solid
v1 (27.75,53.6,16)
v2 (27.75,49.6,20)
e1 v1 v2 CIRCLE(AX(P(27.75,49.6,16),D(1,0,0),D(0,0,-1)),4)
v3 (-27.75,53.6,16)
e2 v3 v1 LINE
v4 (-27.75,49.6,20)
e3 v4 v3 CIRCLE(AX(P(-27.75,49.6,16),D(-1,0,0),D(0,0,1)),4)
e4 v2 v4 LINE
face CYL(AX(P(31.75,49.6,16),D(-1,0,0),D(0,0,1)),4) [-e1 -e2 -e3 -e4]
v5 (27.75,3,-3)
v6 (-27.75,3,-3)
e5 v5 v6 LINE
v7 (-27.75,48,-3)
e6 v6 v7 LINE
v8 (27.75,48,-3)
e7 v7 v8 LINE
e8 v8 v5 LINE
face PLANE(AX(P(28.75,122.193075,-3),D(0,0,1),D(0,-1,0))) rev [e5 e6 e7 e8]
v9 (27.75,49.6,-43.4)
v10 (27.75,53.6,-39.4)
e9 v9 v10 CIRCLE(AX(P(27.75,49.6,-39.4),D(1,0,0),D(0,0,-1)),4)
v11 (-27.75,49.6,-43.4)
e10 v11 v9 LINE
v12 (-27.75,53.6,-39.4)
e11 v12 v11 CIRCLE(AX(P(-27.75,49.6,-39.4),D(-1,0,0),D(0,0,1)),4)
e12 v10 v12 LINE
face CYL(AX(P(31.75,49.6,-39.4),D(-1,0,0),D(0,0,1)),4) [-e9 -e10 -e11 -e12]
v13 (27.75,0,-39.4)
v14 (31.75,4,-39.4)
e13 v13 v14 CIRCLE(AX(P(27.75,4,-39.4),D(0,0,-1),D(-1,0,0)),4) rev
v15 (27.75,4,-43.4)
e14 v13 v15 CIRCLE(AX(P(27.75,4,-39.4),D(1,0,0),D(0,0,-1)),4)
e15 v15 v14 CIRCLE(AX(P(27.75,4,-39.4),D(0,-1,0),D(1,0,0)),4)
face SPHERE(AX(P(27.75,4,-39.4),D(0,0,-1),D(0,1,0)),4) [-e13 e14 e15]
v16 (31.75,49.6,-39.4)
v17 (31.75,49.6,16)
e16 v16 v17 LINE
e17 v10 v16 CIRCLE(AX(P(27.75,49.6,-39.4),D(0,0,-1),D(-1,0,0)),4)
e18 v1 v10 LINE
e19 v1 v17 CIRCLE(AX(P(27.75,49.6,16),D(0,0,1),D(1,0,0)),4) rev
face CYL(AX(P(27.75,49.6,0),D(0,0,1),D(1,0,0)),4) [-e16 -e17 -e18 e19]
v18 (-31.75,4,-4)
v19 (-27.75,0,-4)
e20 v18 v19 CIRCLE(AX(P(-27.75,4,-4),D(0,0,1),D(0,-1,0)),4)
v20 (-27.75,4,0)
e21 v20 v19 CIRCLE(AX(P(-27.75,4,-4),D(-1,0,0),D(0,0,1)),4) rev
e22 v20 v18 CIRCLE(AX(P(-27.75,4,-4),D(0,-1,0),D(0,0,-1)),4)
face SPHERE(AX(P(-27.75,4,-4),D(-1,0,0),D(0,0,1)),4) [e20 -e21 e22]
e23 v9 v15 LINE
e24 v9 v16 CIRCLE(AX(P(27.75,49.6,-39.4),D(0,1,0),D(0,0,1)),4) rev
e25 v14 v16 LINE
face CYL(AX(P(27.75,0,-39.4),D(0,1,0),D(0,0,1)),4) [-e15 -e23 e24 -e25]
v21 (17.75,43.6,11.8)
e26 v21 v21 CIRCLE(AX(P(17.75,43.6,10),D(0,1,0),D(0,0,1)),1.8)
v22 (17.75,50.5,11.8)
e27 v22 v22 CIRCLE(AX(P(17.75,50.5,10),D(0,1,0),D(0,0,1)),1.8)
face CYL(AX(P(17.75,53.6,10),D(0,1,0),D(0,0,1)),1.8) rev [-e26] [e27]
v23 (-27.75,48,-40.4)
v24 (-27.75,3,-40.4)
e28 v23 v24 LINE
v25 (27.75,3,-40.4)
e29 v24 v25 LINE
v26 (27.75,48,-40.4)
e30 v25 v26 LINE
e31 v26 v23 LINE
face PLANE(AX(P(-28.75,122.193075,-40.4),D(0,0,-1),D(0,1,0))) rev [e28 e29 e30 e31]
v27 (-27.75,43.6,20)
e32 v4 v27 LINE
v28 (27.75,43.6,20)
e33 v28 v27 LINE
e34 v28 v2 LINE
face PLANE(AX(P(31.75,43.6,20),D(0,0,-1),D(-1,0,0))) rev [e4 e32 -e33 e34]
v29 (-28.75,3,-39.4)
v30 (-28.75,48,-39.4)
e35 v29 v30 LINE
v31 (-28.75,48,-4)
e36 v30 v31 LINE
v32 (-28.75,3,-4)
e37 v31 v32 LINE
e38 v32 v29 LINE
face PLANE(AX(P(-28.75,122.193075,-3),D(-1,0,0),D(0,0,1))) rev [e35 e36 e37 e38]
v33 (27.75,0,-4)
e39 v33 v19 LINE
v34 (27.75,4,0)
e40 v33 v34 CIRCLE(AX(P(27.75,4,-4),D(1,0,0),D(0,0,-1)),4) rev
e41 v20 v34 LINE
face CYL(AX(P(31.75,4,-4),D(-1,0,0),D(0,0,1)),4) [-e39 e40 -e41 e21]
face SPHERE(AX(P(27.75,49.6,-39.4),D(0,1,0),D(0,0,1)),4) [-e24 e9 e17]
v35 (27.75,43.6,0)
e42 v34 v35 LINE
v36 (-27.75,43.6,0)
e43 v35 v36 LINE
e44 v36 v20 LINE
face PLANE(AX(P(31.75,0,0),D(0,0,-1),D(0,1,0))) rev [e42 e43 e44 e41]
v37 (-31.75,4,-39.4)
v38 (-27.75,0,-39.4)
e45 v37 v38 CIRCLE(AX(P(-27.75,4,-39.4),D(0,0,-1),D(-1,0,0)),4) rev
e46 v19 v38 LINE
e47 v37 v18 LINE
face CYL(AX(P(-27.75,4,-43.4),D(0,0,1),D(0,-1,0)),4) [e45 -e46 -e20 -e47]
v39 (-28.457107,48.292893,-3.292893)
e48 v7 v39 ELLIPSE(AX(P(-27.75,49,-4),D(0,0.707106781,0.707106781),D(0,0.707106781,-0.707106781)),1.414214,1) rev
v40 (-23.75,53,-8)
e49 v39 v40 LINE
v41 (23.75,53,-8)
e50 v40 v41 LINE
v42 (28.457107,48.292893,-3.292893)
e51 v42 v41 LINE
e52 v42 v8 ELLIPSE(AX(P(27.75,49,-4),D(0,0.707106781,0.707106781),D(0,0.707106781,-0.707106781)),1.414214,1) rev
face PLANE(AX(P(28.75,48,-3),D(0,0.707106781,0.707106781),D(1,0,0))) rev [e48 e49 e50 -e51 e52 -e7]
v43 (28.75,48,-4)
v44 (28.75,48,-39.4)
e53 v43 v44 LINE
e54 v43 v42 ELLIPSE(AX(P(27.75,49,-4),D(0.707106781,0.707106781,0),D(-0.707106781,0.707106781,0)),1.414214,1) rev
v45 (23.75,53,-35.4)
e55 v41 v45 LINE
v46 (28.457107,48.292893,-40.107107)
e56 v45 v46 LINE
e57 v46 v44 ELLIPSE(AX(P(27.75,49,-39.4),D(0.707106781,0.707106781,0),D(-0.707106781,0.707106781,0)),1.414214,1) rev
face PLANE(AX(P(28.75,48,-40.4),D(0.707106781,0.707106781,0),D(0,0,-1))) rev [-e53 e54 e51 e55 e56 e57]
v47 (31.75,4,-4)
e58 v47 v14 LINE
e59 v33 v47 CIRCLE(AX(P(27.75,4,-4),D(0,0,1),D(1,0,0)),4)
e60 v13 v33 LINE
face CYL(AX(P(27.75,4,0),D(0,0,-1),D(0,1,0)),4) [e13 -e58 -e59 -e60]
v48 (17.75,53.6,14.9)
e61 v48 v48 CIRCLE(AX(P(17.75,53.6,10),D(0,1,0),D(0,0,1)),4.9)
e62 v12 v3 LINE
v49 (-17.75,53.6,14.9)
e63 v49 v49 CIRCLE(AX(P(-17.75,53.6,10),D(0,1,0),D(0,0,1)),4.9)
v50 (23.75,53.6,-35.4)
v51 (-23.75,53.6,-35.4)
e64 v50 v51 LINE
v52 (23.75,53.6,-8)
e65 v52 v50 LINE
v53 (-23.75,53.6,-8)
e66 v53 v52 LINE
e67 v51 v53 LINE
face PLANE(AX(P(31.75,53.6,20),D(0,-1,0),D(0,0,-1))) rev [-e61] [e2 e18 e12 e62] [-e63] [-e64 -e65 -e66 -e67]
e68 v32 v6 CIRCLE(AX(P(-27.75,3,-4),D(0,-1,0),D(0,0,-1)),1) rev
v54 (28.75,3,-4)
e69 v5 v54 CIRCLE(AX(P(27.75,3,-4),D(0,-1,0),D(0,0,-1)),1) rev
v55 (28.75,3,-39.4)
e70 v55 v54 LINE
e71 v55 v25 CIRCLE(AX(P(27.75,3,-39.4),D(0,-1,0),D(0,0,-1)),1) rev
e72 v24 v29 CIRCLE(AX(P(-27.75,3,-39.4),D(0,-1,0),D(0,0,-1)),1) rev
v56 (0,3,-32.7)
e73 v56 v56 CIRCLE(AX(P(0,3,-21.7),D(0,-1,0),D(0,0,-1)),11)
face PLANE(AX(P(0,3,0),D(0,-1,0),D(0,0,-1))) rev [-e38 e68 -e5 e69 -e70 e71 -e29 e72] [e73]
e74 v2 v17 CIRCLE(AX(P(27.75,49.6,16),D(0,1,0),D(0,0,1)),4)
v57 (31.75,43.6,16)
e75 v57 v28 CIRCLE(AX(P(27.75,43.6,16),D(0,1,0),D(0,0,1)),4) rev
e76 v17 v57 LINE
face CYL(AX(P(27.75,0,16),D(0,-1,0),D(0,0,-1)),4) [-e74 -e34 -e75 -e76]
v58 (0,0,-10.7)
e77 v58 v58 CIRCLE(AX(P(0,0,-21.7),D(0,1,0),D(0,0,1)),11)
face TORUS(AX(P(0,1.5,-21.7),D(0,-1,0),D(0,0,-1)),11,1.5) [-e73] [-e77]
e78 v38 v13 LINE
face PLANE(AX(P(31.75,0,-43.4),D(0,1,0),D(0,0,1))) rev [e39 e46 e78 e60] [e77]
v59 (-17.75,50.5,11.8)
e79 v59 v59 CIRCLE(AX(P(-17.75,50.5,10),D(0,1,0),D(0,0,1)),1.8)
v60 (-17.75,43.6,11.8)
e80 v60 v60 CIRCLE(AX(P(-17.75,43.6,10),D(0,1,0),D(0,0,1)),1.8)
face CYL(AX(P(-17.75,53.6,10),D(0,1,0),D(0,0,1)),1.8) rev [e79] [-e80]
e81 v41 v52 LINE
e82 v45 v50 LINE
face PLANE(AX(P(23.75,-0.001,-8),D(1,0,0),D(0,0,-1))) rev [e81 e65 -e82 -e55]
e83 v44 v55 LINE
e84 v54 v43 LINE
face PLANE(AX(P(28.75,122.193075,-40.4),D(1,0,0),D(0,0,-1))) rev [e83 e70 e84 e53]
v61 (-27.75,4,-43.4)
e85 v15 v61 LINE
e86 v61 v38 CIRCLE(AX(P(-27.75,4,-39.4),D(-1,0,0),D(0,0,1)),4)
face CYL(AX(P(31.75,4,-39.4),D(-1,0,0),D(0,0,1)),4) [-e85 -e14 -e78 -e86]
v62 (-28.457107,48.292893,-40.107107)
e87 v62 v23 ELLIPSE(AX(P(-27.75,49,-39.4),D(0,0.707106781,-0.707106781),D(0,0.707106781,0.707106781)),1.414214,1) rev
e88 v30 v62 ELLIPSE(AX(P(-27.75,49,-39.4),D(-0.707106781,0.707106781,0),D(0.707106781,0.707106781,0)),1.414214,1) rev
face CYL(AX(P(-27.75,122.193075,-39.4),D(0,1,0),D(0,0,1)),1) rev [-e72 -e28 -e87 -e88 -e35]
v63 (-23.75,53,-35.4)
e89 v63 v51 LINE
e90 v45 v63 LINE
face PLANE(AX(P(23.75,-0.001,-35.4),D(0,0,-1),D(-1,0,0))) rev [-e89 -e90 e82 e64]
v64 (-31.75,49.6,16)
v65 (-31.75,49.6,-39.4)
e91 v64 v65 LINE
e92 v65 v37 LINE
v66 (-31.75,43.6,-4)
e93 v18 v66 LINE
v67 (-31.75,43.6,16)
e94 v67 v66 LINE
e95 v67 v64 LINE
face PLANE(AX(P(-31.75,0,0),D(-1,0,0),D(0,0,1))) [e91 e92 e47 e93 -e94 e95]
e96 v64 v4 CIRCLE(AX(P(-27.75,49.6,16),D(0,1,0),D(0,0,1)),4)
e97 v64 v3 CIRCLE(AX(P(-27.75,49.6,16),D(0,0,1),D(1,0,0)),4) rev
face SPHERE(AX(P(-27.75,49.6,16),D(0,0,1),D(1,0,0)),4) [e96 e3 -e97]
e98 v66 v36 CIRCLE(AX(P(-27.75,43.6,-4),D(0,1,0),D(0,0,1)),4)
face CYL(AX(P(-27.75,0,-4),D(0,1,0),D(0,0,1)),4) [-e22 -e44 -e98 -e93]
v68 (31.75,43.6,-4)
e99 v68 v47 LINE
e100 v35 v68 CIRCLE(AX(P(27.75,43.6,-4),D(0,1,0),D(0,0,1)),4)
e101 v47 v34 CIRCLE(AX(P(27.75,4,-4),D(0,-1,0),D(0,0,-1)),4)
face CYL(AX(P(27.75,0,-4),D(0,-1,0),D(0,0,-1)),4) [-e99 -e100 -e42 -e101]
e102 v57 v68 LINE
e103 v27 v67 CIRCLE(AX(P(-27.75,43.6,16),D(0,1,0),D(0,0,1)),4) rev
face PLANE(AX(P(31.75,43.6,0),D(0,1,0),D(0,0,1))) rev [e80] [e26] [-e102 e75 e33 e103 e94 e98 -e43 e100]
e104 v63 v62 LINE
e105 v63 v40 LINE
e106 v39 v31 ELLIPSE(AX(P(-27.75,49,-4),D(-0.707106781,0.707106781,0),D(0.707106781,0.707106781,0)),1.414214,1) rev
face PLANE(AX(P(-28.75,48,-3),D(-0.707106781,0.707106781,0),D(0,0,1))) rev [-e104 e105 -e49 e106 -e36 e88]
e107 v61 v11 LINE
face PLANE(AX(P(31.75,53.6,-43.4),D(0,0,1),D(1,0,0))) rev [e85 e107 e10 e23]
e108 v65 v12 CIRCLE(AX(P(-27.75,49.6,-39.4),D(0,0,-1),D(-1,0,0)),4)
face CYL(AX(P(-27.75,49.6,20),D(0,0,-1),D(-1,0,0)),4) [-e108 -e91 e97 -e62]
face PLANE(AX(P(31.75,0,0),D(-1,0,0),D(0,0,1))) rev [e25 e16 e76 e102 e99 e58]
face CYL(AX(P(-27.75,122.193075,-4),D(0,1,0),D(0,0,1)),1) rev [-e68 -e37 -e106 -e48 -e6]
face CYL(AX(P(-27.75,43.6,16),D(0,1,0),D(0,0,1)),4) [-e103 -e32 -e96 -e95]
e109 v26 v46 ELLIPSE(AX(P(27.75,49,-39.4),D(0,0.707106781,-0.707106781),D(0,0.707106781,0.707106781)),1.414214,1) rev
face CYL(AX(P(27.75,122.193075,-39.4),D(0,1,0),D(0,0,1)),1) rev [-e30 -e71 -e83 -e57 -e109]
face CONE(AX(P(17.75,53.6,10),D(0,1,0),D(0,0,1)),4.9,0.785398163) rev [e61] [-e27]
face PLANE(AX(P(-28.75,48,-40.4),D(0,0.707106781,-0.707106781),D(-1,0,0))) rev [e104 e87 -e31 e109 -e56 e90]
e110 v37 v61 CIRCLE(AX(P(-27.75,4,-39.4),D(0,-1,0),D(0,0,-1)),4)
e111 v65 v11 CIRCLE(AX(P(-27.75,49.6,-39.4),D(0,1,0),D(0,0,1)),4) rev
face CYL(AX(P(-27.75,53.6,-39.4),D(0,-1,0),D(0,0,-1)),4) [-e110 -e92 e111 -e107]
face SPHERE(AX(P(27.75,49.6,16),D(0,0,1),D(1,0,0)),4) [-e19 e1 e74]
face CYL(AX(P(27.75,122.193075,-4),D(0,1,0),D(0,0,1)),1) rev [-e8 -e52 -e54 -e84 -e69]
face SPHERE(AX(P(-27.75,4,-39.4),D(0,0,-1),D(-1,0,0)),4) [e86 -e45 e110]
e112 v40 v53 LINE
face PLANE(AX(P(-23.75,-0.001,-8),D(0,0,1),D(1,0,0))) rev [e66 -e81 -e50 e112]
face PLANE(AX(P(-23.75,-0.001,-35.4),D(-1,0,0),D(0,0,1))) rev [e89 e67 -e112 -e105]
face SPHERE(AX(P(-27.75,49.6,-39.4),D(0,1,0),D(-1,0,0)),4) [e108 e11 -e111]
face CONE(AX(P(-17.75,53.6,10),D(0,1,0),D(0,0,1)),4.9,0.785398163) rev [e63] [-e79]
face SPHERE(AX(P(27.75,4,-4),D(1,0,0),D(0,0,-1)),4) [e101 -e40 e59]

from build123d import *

# Parameters (mm, degrees)
PROFILE_EXTRUDE_DEPTH                           = 31.75
INTERIOR_START                                  = -3
INTERIOR_SKETCH_W                               = 57.5
INTERIOR_SKETCH_H                               = 37.4
INTERIOR_CUT_DEPTH                              = 50
OPENING_CUT_REACH                               = 77.925
OPENING_SKETCH_W                                = 47.5
OPENING_SKETCH_H                                = 27.4
CHAMFER1_SIZE                                   = 5
FILLET1_R                                       = 1
CUT_EXTRUDE3_REACH                              = 77.925
SKETCH5_R                                       = 9.5
FILLET2_R                                       = 1.5
FILLET3_R                                       = 4
CSK_FOR_M3_FLAT_HEAD_MACHINE_SCREW1_D           = 3.6
CSK_FOR_M3_FLAT_HEAD_MACHINE_SCREW1_CSINK_D     = 9.8
CSK_FOR_M3_FLAT_HEAD_MACHINE_SCREW1_CSINK_ANGLE = 90


with BuildPart() as part:
    # Profile Sketch → Profile Extrude (new, symmetric)
    with BuildSketch(Plane(origin=(0, 0, 0), x_dir=(0, 0, -1), z_dir=(1, 0, 0))):
        Polygon((0, 0), (0, 43.6), (-20, 43.6), (-20, 53.6), (43.4, 53.6), (43.4, 0), align=None)
    extrude(amount=PROFILE_EXTRUDE_DEPTH, both=True)

    # Interior Sketch → Interior Cut (cut)
    with BuildSketch(Plane.XZ.offset(INTERIOR_START)):
        with Locations((0, -21.7)):
            Rectangle(INTERIOR_SKETCH_W, INTERIOR_SKETCH_H)
    extrude(amount=-INTERIOR_CUT_DEPTH, mode=Mode.SUBTRACT)

    # Opening Sketch → Opening Cut (cut, up to next)
    with BuildSketch(Plane(origin=(0, 53.6, 0), x_dir=(1, 0, 0), z_dir=(0, 1, 0)), mode=Mode.PRIVATE) as opening_cut_sk1:
        with Locations((0, 21.7)):
            Rectangle(OPENING_SKETCH_W, OPENING_SKETCH_H)
    opening_cut_tool1 = extrude(opening_cut_sk1.sketch, amount=-OPENING_CUT_REACH, mode=Mode.PRIVATE) & part.part
    add(opening_cut_tool1.solids().sort_by_distance((0, 53.6, -21.7))[0], mode=Mode.SUBTRACT)

    # Chamfer1
    chamfer1_edges = [part.edges().sort_by_distance(p)[0] for p in [
        (0, 53, -3),
        (28.75, 53, -21.7),
        (0, 53, -40.4),
        (-28.75, 53, -21.7),
    ]]
    chamfer(chamfer1_edges, length=CHAMFER1_SIZE - 0.0001)  # a hair under: the kernel refuses the full size

    # Fillet1
    fillet1_edges = [part.edges().sort_by_distance(p)[0] for p in [
        (28.75, 25.50005, -40.4),
        (28.75, 25.50005, -3),
        (-28.75, 25.50005, -40.4),
        (-28.75, 25.50005, -3),
    ]]
    fillet(fillet1_edges, radius=FILLET1_R)

    # Sketch5 → Cut-Extrude3 (cut, up to next)
    with BuildSketch(Plane.XZ, mode=Mode.PRIVATE) as cut_extrude3_sk1:
        with Locations(Location((0, -21.7, 0), (0, 0, 270))):
            Circle(SKETCH5_R)
    cut_extrude3_tool1 = extrude(cut_extrude3_sk1.sketch, amount=-CUT_EXTRUDE3_REACH, mode=Mode.PRIVATE) & part.part
    add(cut_extrude3_tool1.solids().sort_by_distance((0, 0, -21.7))[0], mode=Mode.SUBTRACT)

    # Fillet2
    fillet2_edges = [part.edges().sort_by_distance(p)[0] for p in [
        (0, 0, -12.2),
        (0, 3, -12.2),
    ]]
    fillet(fillet2_edges, radius=FILLET2_R - 0.0001)  # a hair under: the kernel refuses the full size

    # Fillet3
    fillet3_edges = [part.edges().sort_by_distance(p)[0] for p in [
        (0, 0, 0),
        (0, 53.6, 20),
        (0, 53.6, -43.4),
        (0, 0, -43.4),
        (31.75, 53.6, -11.7),
        (31.75, 48.6, 20),
        (31.75, 21.8, 0),
        (31.75, 0, -21.7),
        (-31.75, 21.8, 0),
        (-31.75, 48.6, 20),
        (-31.75, 53.6, -11.7),
        (-31.75, 26.8, -43.4),
        (-31.75, 0, -21.7),
        (31.75, 26.8, -43.4),
    ]]
    fillet(fillet3_edges, radius=FILLET3_R)

    # CSK for M3 Flat Head Machine Screw1 (through all)
    with Locations(Plane(origin=(-17.75, 53.6, 10), x_dir=(0, 0, 1), z_dir=(0, 1, 0))):
        with Locations((0, 0), (0, 35.5)):
            CounterSinkHole(CSK_FOR_M3_FLAT_HEAD_MACHINE_SCREW1_D / 2, CSK_FOR_M3_FLAT_HEAD_MACHINE_SCREW1_CSINK_D / 2, counter_sink_angle=CSK_FOR_M3_FLAT_HEAD_MACHINE_SCREW1_CSINK_ANGLE)


solid = part.part
